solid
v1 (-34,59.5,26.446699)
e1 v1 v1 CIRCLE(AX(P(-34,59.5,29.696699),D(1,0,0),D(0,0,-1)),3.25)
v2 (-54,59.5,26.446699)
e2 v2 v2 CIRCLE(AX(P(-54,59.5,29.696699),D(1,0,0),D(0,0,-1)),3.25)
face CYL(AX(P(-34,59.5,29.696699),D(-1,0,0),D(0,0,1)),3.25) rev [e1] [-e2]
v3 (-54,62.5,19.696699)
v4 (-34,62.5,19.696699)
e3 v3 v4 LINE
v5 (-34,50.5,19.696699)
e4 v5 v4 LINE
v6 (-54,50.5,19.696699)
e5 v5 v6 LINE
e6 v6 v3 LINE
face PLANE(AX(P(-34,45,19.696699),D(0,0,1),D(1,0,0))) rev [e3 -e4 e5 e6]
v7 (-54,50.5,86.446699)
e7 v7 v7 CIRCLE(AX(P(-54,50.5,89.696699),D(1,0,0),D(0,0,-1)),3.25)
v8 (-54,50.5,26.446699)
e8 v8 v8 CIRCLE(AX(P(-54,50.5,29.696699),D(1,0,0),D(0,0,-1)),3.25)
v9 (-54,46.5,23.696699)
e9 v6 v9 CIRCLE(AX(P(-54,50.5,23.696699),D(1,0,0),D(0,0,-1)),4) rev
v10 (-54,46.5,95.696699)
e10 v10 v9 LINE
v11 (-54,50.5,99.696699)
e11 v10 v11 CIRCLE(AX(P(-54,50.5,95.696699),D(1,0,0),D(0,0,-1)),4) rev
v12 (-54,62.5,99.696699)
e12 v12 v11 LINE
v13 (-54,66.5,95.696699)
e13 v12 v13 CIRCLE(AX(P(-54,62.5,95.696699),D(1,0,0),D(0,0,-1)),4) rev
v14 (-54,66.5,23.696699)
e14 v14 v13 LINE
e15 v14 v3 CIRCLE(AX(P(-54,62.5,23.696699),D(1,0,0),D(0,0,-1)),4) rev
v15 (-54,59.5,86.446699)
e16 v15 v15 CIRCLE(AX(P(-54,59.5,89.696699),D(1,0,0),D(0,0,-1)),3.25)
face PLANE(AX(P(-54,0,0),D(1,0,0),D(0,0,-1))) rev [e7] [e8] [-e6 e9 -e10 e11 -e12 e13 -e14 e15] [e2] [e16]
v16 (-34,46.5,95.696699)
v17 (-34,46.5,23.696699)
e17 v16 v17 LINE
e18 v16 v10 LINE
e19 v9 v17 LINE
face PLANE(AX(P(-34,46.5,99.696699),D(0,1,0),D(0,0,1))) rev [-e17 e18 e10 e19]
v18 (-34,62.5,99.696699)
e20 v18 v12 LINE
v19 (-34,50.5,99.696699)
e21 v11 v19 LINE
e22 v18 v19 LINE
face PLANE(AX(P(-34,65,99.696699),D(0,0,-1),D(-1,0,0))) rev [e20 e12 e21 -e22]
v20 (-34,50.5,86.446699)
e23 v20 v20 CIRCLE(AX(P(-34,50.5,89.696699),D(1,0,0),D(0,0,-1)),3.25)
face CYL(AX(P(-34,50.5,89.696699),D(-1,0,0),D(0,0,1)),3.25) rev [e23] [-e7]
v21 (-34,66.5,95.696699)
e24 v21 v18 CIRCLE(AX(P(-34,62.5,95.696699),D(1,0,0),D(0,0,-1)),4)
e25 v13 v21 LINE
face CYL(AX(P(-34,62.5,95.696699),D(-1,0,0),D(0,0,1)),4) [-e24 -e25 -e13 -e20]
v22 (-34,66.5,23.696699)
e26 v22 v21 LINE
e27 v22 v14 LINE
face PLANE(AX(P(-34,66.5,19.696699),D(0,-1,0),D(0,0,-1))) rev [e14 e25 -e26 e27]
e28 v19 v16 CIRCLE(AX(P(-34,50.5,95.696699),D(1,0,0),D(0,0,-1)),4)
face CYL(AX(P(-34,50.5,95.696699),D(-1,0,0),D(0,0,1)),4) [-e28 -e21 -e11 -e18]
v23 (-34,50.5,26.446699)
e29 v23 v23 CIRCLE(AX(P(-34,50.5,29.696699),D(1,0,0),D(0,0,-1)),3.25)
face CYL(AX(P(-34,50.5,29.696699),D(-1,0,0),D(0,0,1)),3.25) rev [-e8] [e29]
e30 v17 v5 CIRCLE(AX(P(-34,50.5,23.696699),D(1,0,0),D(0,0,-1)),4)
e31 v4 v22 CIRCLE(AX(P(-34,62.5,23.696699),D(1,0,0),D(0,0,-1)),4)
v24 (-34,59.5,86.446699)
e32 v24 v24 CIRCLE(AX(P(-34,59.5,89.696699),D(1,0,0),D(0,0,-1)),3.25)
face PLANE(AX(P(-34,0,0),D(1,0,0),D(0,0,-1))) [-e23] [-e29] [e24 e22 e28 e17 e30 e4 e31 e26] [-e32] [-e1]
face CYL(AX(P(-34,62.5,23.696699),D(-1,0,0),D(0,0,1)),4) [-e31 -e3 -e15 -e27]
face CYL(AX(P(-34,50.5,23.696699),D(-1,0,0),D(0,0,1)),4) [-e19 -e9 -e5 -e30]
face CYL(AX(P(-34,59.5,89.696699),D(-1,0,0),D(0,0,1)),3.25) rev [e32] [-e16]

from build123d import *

# Parameters (mm, degrees)
BOSS_EXTRUDE1_DEPTH      = 90
FILLET1_R                = 7.5
FILLET2_R                = 2
SKETCH2_W                = 20
SKETCH2_H                = 80
SKETCH2_W_2              = 32
BOSS_EXTRUDE2_DEPTH      = 20
SKETCH3_R                = 2.5
BOSS_EXTRUDE3_DEPTH      = 111
BOSS_EXTRUDE4_START      = 7.5
SKETCH4_W                = 80
SKETCH4_H                = 20
SKETCH4_R                = 3.25
BOSS_EXTRUDE4_DEPTH      = 20
MOVE_FACE1_BY            = 1.5
MOVE_FACE2_BY            = 1.5
FILLET3_R                = 4
FILLET4_R                = 4
CUT_EXTRUDE1_DEPTH       = 2
BOSS_EXTRUDE5_DEPTH      = 2
SKETCH7_W                = 58
SKETCH7_H                = 15
CUT_EXTRUDE2_DEPTH       = 0.5
SKETCH8_R                = 10
BOSS_EXTRUDE6_DEPTH      = 1.5
SKETCH10_R               = 4.25
SKETCH10_R_2             = 2.75
CUT_EXTRUDE_THIN1_DEPTH  = 1.5
SKETCH11_RX              = 5
SKETCH11_RY              = 2.5
BOSS_EXTRUDE7_DEPTH      = 1.5
LPATTERN1_COUNT          = 3
LPATTERN1_PITCH          = 24
SKETCH12_RX              = 5
SKETCH12_RY              = 2.5
BOSS_EXTRUDE8_DEPTH      = 1.5
LPATTERN2_START          = 113.13708499
LPATTERN2_DEPTH          = 1.5
FILLET7_R                = 7.5
FILLET5_R                = 5
FILLET6_R                = 2
SHELL1_T                 = -1
SKETCH14_R               = 14
BOSS_EXTRUDE9_DEPTH      = 1
BOSS_EXTRUDE10_DEPTH     = 1
BOSS_EXTRUDE11_START     = -30
BOSS_EXTRUDE11_OUTLINE_R = 13
BOSS_EXTRUDE11_DEPTH     = 10
BOSS_EXTRUDE12_REACH     = 233.484
SKETCH18_R               = 3
SKETCH17_W               = 1.5
SKETCH17_H               = 20
SKETCH17_W_2             = 20
SKETCH17_H_2             = 1.5
EXTRUDE_THIN1_DEPTH      = 63.5
SKETCH20_R               = 12.5
BOSS_EXTRUDE13_DEPTH     = 5
FILLET8_R                = 2


# Read off the part's stored shape, not the designer's step: LPattern2, Body-Move/Copy1, Boss-Extrude11
with BuildPart() as part:
    # Sketch1 → Boss-Extrude1 (new, symmetric)
    with BuildSketch(Plane(origin=(0, 0, 0), x_dir=(0, 0, -1), z_dir=(1, 0, 0))):
        Polygon((0, 0), (0, 45), (-115, 45), (-160, 0), align=None)
    extrude(amount=BOSS_EXTRUDE1_DEPTH, both=True)

    # Fillet1
    fillet1_edges = [part.edges().sort_by_distance(p)[0] for p in [
        (0, 0, 160),
        (0, 45, 115),
        (0, 45, 0),
        (0, 0, 0),
    ]]
    fillet(fillet1_edges, radius=FILLET1_R)

    # Fillet2
    fillet2_edges = [part.edges().sort_by_distance(p)[0] for p in [
        (-90, 0, 74.696699141),
        (90, 0, 74.696699141),
        (-90, 27.803300859, 132.196699141),
        (-90, 45, 59.696699141),
        (-90, 22.5, 0),
        (-90, 44.429096494, 114.763524025),
        (-90, 2.196699141, 2.196699141),
        (-90, 42.803300859, 2.196699141),
        (-90, 4.629874257, 148.822494776),
        (90, 27.803300859, 132.196699141),
        (90, 22.5, 0),
        (90, 45, 59.696699141),
        (90, 44.429096494, 114.763524025),
        (90, 2.196699141, 2.196699141),
        (90, 42.803300859, 2.196699141),
        (90, 4.629874257, 148.822494776),
    ]]
    fillet(fillet2_edges, radius=FILLET2_R)

    # Sketch2 → Boss-Extrude2 (add)
    with BuildSketch(Plane(origin=(0, 45, 0), x_dir=(1, 0, 0), z_dir=(0, 1, 0))):
        with Locations((-71.5, -59.696699141)):
            Rectangle(SKETCH2_W, SKETCH2_H)
        with Locations((65.5, -59.696699141)):
            Rectangle(SKETCH2_W_2, SKETCH2_H)
    extrude(amount=BOSS_EXTRUDE2_DEPTH)

    # Sketch3 → Boss-Extrude3 (add)
    with BuildSketch(Plane(origin=(-61.5, 0, 0), x_dir=(0, 0, -1), z_dir=(1, 0, 0))):
        with Locations(Location((-89.696699141, 59.5, 0), (0, 0, 180))):
            Circle(SKETCH3_R)
        with Locations(Location((-89.696699141, 50.5, 0), (0, 0, 180))):
            Circle(SKETCH3_R)
        with Locations(Location((-29.696699141, 50.5, 0), (0, 0, 180))):
            Circle(SKETCH3_R)
        with Locations(Location((-29.696699141, 59.5, 0), (0, 0, 180))):
            Circle(SKETCH3_R)
    extrude(amount=BOSS_EXTRUDE3_DEPTH)

    # Fillet3
    fillet3_edges = [part.edges().sort_by_distance(p)[0] for p in [
        (65.5, 65, 99.696699141),
        (65.5, 65, 19.696699141),
        (-71.5, 65, 99.696699141),
        (-71.5, 65, 19.696699141),
    ]]
    fillet(fillet3_edges, radius=FILLET3_R)

    # Sketch5 → Cut-Extrude1 (cut)
    with BuildSketch(Plane(origin=(0, 80, 80), x_dir=(1, 0, 0), z_dir=(0, 0.7071067811865511, 0.707106781186544))):
        with BuildLine():
            Line((-65, -56.317279836), (65, -56.317279836))
            ThreePointArc((65, -56.317279836), (66.767766953, -57.049512883), (67.5, -58.817279836))
            Line((67.5, -58.817279836), (67.5, -88.817279836))
            ThreePointArc((67.5, -88.817279836), (66.767766953, -90.585046789), (65, -91.317279836))
            Line((65, -91.317279836), (-65, -91.317279836))
            ThreePointArc((-65, -91.317279836), (-66.767766953, -90.585046789), (-67.5, -88.817279836))
            Line((-67.5, -88.817279836), (-67.5, -58.817279836))
            ThreePointArc((-67.5, -58.817279836), (-66.767766953, -57.049512883), (-65, -56.317279836))
        make_face()
    extrude(amount=-CUT_EXTRUDE1_DEPTH, mode=Mode.SUBTRACT)


with BuildPart() as body_2:
    # Sketch4 → Boss-Extrude4 (new body)
    with BuildSketch(Plane(origin=(-61.5, 0, 0), x_dir=(0, 0, -1), z_dir=(1, 0, 0)).offset(BOSS_EXTRUDE4_START)):
        with Locations((-59.696699141, 55)):
            Rectangle(SKETCH4_W, SKETCH4_H)
        with Locations((-89.696699141, 59.5)):
            Circle(SKETCH4_R, mode=Mode.SUBTRACT)
        with Locations((-89.696699141, 50.5)):
            Circle(SKETCH4_R, mode=Mode.SUBTRACT)
        with Locations((-29.696699141, 59.5)):
            Circle(SKETCH4_R, mode=Mode.SUBTRACT)
        with Locations((-29.696699141, 50.5)):
            Circle(SKETCH4_R, mode=Mode.SUBTRACT)
    extrude(amount=BOSS_EXTRUDE4_DEPTH)

    # Move Face1: a face moved outward by 1.5
    extrude(body_2.faces().sort_by_distance((-44, 65, 59.696699141))[0], amount=MOVE_FACE1_BY, dir=(0, 1, 0))

    # Move Face2: a face moved inward by 1.5
    extrude(body_2.faces().sort_by_distance((-44, 45, 59.696699141))[0], amount=MOVE_FACE2_BY, dir=(0, 1, 0), mode=Mode.SUBTRACT)

    # Fillet4
    fillet4_edges = [body_2.edges().sort_by_distance(p)[0] for p in [
        (-44, 66.5, 99.696699141),
        (-44, 66.5, 19.696699141),
        (-44, 46.5, 19.696699141),
        (-44, 46.5, 99.696699141),
    ]]
    fillet(fillet4_edges, radius=FILLET4_R)


with BuildPart() as body_3:
    # Sketch6 → Boss-Extrude5 (new body)
    with BuildSketch(Plane(origin=(0, 78.585786438, 78.585786438), x_dir=(1, 0, 0), z_dir=(0, 0.7071067811865509, 0.7071067811865441))):
        with BuildLine():
            Line((65, -56.317279836), (-65, -56.317279836))
            ThreePointArc((-65, -56.317279836), (-66.767766953, -57.049512883), (-67.5, -58.817279836))
            Line((-67.5, -58.817279836), (-67.5, -88.817279836))
            ThreePointArc((-67.5, -88.817279836), (-66.767766953, -90.585046789), (-65, -91.317279836))
            Line((-65, -91.317279836), (65, -91.317279836))
            ThreePointArc((65, -91.317279836), (66.767766953, -90.585046789), (67.5, -88.817279836))
            Line((67.5, -88.817279836), (67.5, -58.817279836))
            ThreePointArc((67.5, -58.817279836), (66.767766953, -57.049512883), (65, -56.317279836))
        make_face()
    extrude(amount=BOSS_EXTRUDE5_DEPTH)

    # Sketch7 → Cut-Extrude2 (cut)
    with BuildSketch(Plane(origin=(0, 80, 80), x_dir=(1, 0, 0), z_dir=(0, 0.7071067811865509, 0.7071067811865441))):
        with Locations((-28.5, -71.817279836)):
            Rectangle(SKETCH7_W, SKETCH7_H)
    extrude(amount=-CUT_EXTRUDE2_DEPTH, mode=Mode.SUBTRACT)

    # Sketch8 → Boss-Extrude6 (add)
    with BuildSketch(Plane(origin=(0, 80, 80), x_dir=(1, 0, 0), z_dir=(0, 0.7071067811865509, 0.7071067811865441))):
        with Locations(Location((15.5, -71.817279836, 0), (0, 0, 270))):
            Circle(SKETCH8_R)
    extrude(amount=BOSS_EXTRUDE6_DEPTH)

    # Sketch10 → Cut-Extrude-Thin1 (cut)
    # profile 1 of 5: a face of its own
    with BuildSketch(Plane(origin=(0, 81.060660172, 81.060660172), x_dir=(1, 0, 0), z_dir=(0, 0.7071067811865509, 0.7071067811865441))):
        with Locations((15.5, -71.817279836)):
            Circle(SKETCH10_R)
        with Locations((15.5, -71.817279836)):
            Circle(SKETCH10_R_2, mode=Mode.SUBTRACT)
    # profile 2 of 5: a face of its own
    with BuildSketch(Plane(origin=(0, 81.060660172, 81.060660172), x_dir=(1, 0, 0), z_dir=(0, 0.7071067811865509, 0.7071067811865441))):
        Polygon((7.898602102, -65.27654211), (12.49479618, -69.872736188), (13.555456352, -68.812076016), (8.959262274, -64.215881939), align=None)
    # profile 3 of 5: a face of its own
    with BuildSketch(Plane(origin=(0, 81.060660172, 81.060660172), x_dir=(1, 0, 0), z_dir=(0, 0.7071067811865509, 0.7071067811865441))):
        Polygon((22.040737726, -64.215881939), (17.444543648, -68.812076016), (18.50520382, -69.872736188), (23.101397898, -65.27654211), align=None)
    # profile 4 of 5: a face of its own
    with BuildSketch(Plane(origin=(0, 81.060660172, 81.060660172), x_dir=(1, 0, 0), z_dir=(0, 0.7071067811865509, 0.7071067811865441))):
        Polygon((17.444543648, -74.822483656), (22.040737726, -79.418677734), (23.101397898, -78.358017562), (18.50520382, -73.761823485), align=None)
    # profile 5 of 5: a face of its own
    with BuildSketch(Plane(origin=(0, 81.060660172, 81.060660172), x_dir=(1, 0, 0), z_dir=(0, 0.7071067811865509, 0.7071067811865441))):
        Polygon((12.49479618, -73.761823485), (7.898602102, -78.358017562), (8.959262274, -79.418677734), (13.555456352, -74.822483656), align=None)
    extrude(amount=-CUT_EXTRUDE_THIN1_DEPTH, mode=Mode.SUBTRACT)

    # Sketch11 → Boss-Extrude7 (add)
    with BuildSketch(Plane(origin=(0, 80, 80), x_dir=(1, 0, 0), z_dir=(0, 0.7071067811865509, 0.7071067811865441))):
        with Locations((-52.5, -85.317279836)):
            Ellipse(SKETCH11_RX, SKETCH11_RY)
    boss_extrude7 = extrude(amount=BOSS_EXTRUDE7_DEPTH)

    # LPattern1: Boss-Extrude7 ×3
    with Locations(*[(i * LPATTERN1_PITCH, 0, 0) for i in range(1, LPATTERN1_COUNT)]):
        add(boss_extrude7)

    # Sketch12 → Boss-Extrude8 (add)
    with BuildSketch(Plane(origin=(0, 80, 80), x_dir=(1, 0, 0), z_dir=(0, 0.7071067811865509, 0.7071067811865441))):
        with Locations((32.5, -66.317279836)):
            Ellipse(SKETCH12_RX, SKETCH12_RY)
    extrude(amount=BOSS_EXTRUDE8_DEPTH)

    # LPattern2 outline → LPattern2 (add)
    with BuildSketch(Plane(origin=(0, 0, 0), x_dir=(1, 0, 0), z_dir=(0, 0.707106781186551, 0.7071067811865439)).offset(LPATTERN2_START)):
        with BuildLine():
            add(Edge.make_bspline(
                [(37.5, -74.317279836), (37.5, -69.987152818), (30, -72.152216327), (22.5, -74.317279836), (30, -76.482343346), (37.5, -78.647406855), (37.5, -74.317279836)],
                knots=[0, 0, 0, 2.094395102, 2.094395102, 4.188790205, 4.188790205, 6.283185307, 6.283185307, 6.283185307], degree=2, weights=[1, 0.5, 1, 0.5, 1, 0.5, 1]))
        make_face()
        with BuildLine():
            add(Edge.make_bspline(
                [(37.5, -82.317279836), (37.5, -77.987152818), (30, -80.152216327), (22.5, -82.317279836), (30, -84.482343346), (37.5, -86.647406855), (37.5, -82.317279836)],
                knots=[0, 0, 0, 2.094395102, 2.094395102, 4.188790205, 4.188790205, 6.283185307, 6.283185307, 6.283185307], degree=2, weights=[1, 0.5, 1, 0.5, 1, 0.5, 1]))
        make_face()
        with BuildLine():
            add(Edge.make_bspline(
                [(49.5, -66.317279836), (49.5, -61.987152818), (42, -64.152216327), (34.5, -66.317279836), (42, -68.482343346), (49.5, -70.647406855), (49.5, -66.317279836)],
                knots=[0, 0, 0, 2.094395102, 2.094395102, 4.188790205, 4.188790205, 6.283185307, 6.283185307, 6.283185307], degree=2, weights=[1, 0.5, 1, 0.5, 1, 0.5, 1]))
        make_face()
        with BuildLine():
            add(Edge.make_bspline(
                [(49.5, -74.317279836), (49.5, -69.987152818), (42, -72.152216327), (34.5, -74.317279836), (42, -76.482343346), (49.5, -78.647406855), (49.5, -74.317279836)],
                knots=[0, 0, 0, 2.094395102, 2.094395102, 4.188790205, 4.188790205, 6.283185307, 6.283185307, 6.283185307], degree=2, weights=[1, 0.5, 1, 0.5, 1, 0.5, 1]))
        make_face()
        with BuildLine():
            add(Edge.make_bspline(
                [(49.5, -82.317279836), (49.5, -77.987152818), (42, -80.152216327), (34.5, -82.317279836), (42, -84.482343346), (49.5, -86.647406855), (49.5, -82.317279836)],
                knots=[0, 0, 0, 2.094395102, 2.094395102, 4.188790205, 4.188790205, 6.283185307, 6.283185307, 6.283185307], degree=2, weights=[1, 0.5, 1, 0.5, 1, 0.5, 1]))
        make_face()
        with BuildLine():
            add(Edge.make_bspline(
                [(61.5, -66.317279836), (61.5, -61.987152818), (54, -64.152216327), (46.5, -66.317279836), (54, -68.482343346), (61.5, -70.647406855), (61.5, -66.317279836)],
                knots=[0, 0, 0, 2.094395102, 2.094395102, 4.188790205, 4.188790205, 6.283185307, 6.283185307, 6.283185307], degree=2, weights=[1, 0.5, 1, 0.5, 1, 0.5, 1]))
        make_face()
        with BuildLine():
            add(Edge.make_bspline(
                [(61.5, -74.317279836), (61.5, -69.987152818), (54, -72.152216327), (46.5, -74.317279836), (54, -76.482343346), (61.5, -78.647406855), (61.5, -74.317279836)],
                knots=[0, 0, 0, 2.094395102, 2.094395102, 4.188790205, 4.188790205, 6.283185307, 6.283185307, 6.283185307], degree=2, weights=[1, 0.5, 1, 0.5, 1, 0.5, 1]))
        make_face()
        with BuildLine():
            add(Edge.make_bspline(
                [(61.5, -82.317279836), (61.5, -77.987152818), (54, -80.152216327), (46.5, -82.317279836), (54, -84.482343346), (61.5, -86.647406855), (61.5, -82.317279836)],
                knots=[0, 0, 0, 2.094395102, 2.094395102, 4.188790205, 4.188790205, 6.283185307, 6.283185307, 6.283185307], degree=2, weights=[1, 0.5, 1, 0.5, 1, 0.5, 1]))
        make_face()
    extrude(amount=LPATTERN2_DEPTH)


with BuildPart() as body_4:
    # Sketch13 → Revolve1 (revolve)
    with BuildSketch(Plane.XY.offset(59.696699141), mode=Mode.PRIVATE) as revolve1_sk:
        Polygon((11.5, 70), (11.5, 85), (105.301145933, 85), (111.5, 74.263269807), (121.5, 72.5), (121.5, 70), align=None)
    revolve(revolve1_sk.sketch.rotate(Axis((11.5, 70, 59.696699141), (1, 0, 0)), 90), axis=Axis((11.5, 70, 59.696699141), (1, 0, 0)))

    # Fillet5
    fillet5_edges = [body_4.edges().sort_by_distance(p)[0] for p in [
        (105.301145933, 70, 44.696699141),
    ]]
    fillet(fillet5_edges, radius=FILLET5_R)

    # Fillet6
    fillet6_edges = [body_4.edges().sort_by_distance(p)[0] for p in [
        (111.5, 70, 55.433429334),
    ]]
    fillet(fillet6_edges, radius=FILLET6_R)

    # Shell1
    shell1_openings = [body_4.faces().sort_by_distance(p)[0] for p in [
        (121.5, 70, 59.696699141),
        (11.5, 70, 59.696699141),
    ]]
    offset(amount=SHELL1_T, openings=shell1_openings, kind=Kind.INTERSECTION)

    # Sketch14 → Boss-Extrude9 (add)
    with BuildSketch(Plane.ZY.offset(-11.5)):
        with BuildLine():
            Line((55.696699141, 85.491933385), (40.696699141, 81.618950039))
            ThreePointArc((40.696699141, 81.618950039), (31.696699141, 70), (40.696699141, 58.381049961))
            Line((40.696699141, 58.381049961), (55.696699141, 54.508066615))
            ThreePointArc((55.696699141, 54.508066615), (59.696699141, 54), (63.696699141, 54.508066615))
            Line((63.696699141, 54.508066615), (78.696699141, 58.381049961))
            ThreePointArc((78.696699141, 58.381049961), (87.696699141, 70), (78.696699141, 81.618950039))
            Line((78.696699141, 81.618950039), (63.696699141, 85.491933385))
            ThreePointArc((63.696699141, 85.491933385), (59.696699141, 86), (55.696699141, 85.491933385))
        make_face()
        with Locations((59.696699141, 70)):
            Circle(SKETCH14_R, mode=Mode.SUBTRACT)
    extrude(amount=BOSS_EXTRUDE9_DEPTH)


with BuildPart() as body_5:
    # Body-Move/Copy1 outline → Body-Move/Copy1 (revolve)
    with BuildSketch(Plane(origin=(0, 70, 59.696699141), x_dir=(0, 1, 0), z_dir=(0, 0, -1))):
        Polygon((0, 121.5), (0, 11.5), (15, 11.5), (15, 105.301145933), (4.263269807, 111.5), (2.5, 121.5), align=None)
    revolve(axis=Axis((0, 70, 59.696699141), (1, 0, 0)))


with BuildPart() as part_1:
    add(part.part)

    # Combine1: cut body 5
    add(body_5.part, mode=Mode.SUBTRACT)

    # Fillet7
    fillet7_edges = [part_1.edges().sort_by_distance(p)[0] for p in [
        (65.5, 65, 73.838834765),
        (65.5, 65, 45.554563517),
    ]]
    fillet(fillet7_edges, radius=FILLET7_R)

    # Sketch20 → Boss-Extrude13 (add)
    with BuildSketch(Plane.XZ):
        with Locations(Location((-60, 116.893398282, 0), (0, 0, 90))):
            Circle(SKETCH20_R)
        with Locations(Location((-60, 32.5, 0), (0, 0, 90))):
            Circle(SKETCH20_R)
        with Locations(Location((60, 32.5, 0), (0, 0, 90))):
            Circle(SKETCH20_R)
        with Locations(Location((60, 116.893398282, 0), (0, 0, 90))):
            Circle(SKETCH20_R)
    extrude(amount=BOSS_EXTRUDE13_DEPTH)

    # Fillet8
    fillet8_edges = [part_1.edges().sort_by_distance(p)[0] for p in [
        (-60, -5, 104.393398282),
        (-60, -5, 20),
        (60, -5, 20),
        (60, -5, 104.393398282),
    ]]
    fillet(fillet8_edges, radius=FILLET8_R)


with BuildPart() as body_5_2:
    # Sketch15 → Boss-Extrude10 (new body)
    with BuildSketch(Plane(origin=(-34, 0, 0), x_dir=(0, 0, -1), z_dir=(1, 0, 0))):
        with BuildLine():
            Line((-63.696699141, 85.491933385), (-78.696699141, 81.618950039))
            ThreePointArc((-78.696699141, 81.618950039), (-87.696699141, 70), (-78.696699141, 58.381049961))
            Line((-78.696699141, 58.381049961), (-63.696699141, 54.508066615))
            ThreePointArc((-63.696699141, 54.508066615), (-59.696699141, 54), (-55.696699141, 54.508066615))
            Line((-55.696699141, 54.508066615), (-40.696699141, 58.381049961))
            ThreePointArc((-40.696699141, 58.381049961), (-31.696699141, 70), (-40.696699141, 81.618950039))
            Line((-40.696699141, 81.618950039), (-55.696699141, 85.491933385))
            ThreePointArc((-55.696699141, 85.491933385), (-59.696699141, 86), (-63.696699141, 85.491933385))
        make_face()
    extrude(amount=BOSS_EXTRUDE10_DEPTH)


with BuildPart() as body_6:
    # Boss-Extrude11 outline → Boss-Extrude11 (new body)
    with BuildSketch(Plane.ZY.offset(-10.5).offset(BOSS_EXTRUDE11_START)):
        with Locations((59.696699141, 70)):
            Circle(BOSS_EXTRUDE11_OUTLINE_R)
    extrude(amount=BOSS_EXTRUDE11_DEPTH)

    # Sketch18 → Boss-Extrude12 (add, up to next)
    with BuildSketch(Plane(origin=(-33, 0, 0), x_dir=(0, 0, -1), z_dir=(1, 0, 0)), mode=Mode.PRIVATE) as boss_extrude12_sk1:
        with Locations(Location((-59.696699141, 70, 0), (0, 0, 180))):
            Circle(SKETCH18_R)
    boss_extrude12_tool1 = extrude(boss_extrude12_sk1.sketch, amount=BOSS_EXTRUDE12_REACH, mode=Mode.PRIVATE) - body_6.part

    add(body_5_2.part)  # Boss-Extrude12 merges body 5 2
    add(boss_extrude12_tool1.solids().sort_by_distance((-33, 70, 59.696699))[0])

    # Sketch17 → Extrude-Thin1 (add)
    with BuildSketch(Plane(origin=(-33, 0, 0), x_dir=(0, 0, -1), z_dir=(1, 0, 0))):
        with Locations((-59.696699141, 70)):
            Rectangle(SKETCH17_W, SKETCH17_H)
        with Locations((-59.696699141, 70)):
            Rectangle(SKETCH17_W_2, SKETCH17_H_2)
    extrude(amount=EXTRUDE_THIN1_DEPTH)

    # Sketch19 → Cut-Revolve3 (revolve, cut)
    with BuildSketch(Plane.XY.offset(59.696699141), mode=Mode.PRIVATE) as cut_revolve3_sk:
        Polygon((-33, 76.452368755), (-18, 80), (-18, 81.618950039), (-33, 81.618950039), align=None)
    revolve(cut_revolve3_sk.sketch.rotate(Axis((111.5, 70, 59.696699141), (-1, 0, 0)), 270), axis=Axis((111.5, 70, 59.696699141), (-1, 0, 0)), mode=Mode.SUBTRACT)


solid = body_2.part
